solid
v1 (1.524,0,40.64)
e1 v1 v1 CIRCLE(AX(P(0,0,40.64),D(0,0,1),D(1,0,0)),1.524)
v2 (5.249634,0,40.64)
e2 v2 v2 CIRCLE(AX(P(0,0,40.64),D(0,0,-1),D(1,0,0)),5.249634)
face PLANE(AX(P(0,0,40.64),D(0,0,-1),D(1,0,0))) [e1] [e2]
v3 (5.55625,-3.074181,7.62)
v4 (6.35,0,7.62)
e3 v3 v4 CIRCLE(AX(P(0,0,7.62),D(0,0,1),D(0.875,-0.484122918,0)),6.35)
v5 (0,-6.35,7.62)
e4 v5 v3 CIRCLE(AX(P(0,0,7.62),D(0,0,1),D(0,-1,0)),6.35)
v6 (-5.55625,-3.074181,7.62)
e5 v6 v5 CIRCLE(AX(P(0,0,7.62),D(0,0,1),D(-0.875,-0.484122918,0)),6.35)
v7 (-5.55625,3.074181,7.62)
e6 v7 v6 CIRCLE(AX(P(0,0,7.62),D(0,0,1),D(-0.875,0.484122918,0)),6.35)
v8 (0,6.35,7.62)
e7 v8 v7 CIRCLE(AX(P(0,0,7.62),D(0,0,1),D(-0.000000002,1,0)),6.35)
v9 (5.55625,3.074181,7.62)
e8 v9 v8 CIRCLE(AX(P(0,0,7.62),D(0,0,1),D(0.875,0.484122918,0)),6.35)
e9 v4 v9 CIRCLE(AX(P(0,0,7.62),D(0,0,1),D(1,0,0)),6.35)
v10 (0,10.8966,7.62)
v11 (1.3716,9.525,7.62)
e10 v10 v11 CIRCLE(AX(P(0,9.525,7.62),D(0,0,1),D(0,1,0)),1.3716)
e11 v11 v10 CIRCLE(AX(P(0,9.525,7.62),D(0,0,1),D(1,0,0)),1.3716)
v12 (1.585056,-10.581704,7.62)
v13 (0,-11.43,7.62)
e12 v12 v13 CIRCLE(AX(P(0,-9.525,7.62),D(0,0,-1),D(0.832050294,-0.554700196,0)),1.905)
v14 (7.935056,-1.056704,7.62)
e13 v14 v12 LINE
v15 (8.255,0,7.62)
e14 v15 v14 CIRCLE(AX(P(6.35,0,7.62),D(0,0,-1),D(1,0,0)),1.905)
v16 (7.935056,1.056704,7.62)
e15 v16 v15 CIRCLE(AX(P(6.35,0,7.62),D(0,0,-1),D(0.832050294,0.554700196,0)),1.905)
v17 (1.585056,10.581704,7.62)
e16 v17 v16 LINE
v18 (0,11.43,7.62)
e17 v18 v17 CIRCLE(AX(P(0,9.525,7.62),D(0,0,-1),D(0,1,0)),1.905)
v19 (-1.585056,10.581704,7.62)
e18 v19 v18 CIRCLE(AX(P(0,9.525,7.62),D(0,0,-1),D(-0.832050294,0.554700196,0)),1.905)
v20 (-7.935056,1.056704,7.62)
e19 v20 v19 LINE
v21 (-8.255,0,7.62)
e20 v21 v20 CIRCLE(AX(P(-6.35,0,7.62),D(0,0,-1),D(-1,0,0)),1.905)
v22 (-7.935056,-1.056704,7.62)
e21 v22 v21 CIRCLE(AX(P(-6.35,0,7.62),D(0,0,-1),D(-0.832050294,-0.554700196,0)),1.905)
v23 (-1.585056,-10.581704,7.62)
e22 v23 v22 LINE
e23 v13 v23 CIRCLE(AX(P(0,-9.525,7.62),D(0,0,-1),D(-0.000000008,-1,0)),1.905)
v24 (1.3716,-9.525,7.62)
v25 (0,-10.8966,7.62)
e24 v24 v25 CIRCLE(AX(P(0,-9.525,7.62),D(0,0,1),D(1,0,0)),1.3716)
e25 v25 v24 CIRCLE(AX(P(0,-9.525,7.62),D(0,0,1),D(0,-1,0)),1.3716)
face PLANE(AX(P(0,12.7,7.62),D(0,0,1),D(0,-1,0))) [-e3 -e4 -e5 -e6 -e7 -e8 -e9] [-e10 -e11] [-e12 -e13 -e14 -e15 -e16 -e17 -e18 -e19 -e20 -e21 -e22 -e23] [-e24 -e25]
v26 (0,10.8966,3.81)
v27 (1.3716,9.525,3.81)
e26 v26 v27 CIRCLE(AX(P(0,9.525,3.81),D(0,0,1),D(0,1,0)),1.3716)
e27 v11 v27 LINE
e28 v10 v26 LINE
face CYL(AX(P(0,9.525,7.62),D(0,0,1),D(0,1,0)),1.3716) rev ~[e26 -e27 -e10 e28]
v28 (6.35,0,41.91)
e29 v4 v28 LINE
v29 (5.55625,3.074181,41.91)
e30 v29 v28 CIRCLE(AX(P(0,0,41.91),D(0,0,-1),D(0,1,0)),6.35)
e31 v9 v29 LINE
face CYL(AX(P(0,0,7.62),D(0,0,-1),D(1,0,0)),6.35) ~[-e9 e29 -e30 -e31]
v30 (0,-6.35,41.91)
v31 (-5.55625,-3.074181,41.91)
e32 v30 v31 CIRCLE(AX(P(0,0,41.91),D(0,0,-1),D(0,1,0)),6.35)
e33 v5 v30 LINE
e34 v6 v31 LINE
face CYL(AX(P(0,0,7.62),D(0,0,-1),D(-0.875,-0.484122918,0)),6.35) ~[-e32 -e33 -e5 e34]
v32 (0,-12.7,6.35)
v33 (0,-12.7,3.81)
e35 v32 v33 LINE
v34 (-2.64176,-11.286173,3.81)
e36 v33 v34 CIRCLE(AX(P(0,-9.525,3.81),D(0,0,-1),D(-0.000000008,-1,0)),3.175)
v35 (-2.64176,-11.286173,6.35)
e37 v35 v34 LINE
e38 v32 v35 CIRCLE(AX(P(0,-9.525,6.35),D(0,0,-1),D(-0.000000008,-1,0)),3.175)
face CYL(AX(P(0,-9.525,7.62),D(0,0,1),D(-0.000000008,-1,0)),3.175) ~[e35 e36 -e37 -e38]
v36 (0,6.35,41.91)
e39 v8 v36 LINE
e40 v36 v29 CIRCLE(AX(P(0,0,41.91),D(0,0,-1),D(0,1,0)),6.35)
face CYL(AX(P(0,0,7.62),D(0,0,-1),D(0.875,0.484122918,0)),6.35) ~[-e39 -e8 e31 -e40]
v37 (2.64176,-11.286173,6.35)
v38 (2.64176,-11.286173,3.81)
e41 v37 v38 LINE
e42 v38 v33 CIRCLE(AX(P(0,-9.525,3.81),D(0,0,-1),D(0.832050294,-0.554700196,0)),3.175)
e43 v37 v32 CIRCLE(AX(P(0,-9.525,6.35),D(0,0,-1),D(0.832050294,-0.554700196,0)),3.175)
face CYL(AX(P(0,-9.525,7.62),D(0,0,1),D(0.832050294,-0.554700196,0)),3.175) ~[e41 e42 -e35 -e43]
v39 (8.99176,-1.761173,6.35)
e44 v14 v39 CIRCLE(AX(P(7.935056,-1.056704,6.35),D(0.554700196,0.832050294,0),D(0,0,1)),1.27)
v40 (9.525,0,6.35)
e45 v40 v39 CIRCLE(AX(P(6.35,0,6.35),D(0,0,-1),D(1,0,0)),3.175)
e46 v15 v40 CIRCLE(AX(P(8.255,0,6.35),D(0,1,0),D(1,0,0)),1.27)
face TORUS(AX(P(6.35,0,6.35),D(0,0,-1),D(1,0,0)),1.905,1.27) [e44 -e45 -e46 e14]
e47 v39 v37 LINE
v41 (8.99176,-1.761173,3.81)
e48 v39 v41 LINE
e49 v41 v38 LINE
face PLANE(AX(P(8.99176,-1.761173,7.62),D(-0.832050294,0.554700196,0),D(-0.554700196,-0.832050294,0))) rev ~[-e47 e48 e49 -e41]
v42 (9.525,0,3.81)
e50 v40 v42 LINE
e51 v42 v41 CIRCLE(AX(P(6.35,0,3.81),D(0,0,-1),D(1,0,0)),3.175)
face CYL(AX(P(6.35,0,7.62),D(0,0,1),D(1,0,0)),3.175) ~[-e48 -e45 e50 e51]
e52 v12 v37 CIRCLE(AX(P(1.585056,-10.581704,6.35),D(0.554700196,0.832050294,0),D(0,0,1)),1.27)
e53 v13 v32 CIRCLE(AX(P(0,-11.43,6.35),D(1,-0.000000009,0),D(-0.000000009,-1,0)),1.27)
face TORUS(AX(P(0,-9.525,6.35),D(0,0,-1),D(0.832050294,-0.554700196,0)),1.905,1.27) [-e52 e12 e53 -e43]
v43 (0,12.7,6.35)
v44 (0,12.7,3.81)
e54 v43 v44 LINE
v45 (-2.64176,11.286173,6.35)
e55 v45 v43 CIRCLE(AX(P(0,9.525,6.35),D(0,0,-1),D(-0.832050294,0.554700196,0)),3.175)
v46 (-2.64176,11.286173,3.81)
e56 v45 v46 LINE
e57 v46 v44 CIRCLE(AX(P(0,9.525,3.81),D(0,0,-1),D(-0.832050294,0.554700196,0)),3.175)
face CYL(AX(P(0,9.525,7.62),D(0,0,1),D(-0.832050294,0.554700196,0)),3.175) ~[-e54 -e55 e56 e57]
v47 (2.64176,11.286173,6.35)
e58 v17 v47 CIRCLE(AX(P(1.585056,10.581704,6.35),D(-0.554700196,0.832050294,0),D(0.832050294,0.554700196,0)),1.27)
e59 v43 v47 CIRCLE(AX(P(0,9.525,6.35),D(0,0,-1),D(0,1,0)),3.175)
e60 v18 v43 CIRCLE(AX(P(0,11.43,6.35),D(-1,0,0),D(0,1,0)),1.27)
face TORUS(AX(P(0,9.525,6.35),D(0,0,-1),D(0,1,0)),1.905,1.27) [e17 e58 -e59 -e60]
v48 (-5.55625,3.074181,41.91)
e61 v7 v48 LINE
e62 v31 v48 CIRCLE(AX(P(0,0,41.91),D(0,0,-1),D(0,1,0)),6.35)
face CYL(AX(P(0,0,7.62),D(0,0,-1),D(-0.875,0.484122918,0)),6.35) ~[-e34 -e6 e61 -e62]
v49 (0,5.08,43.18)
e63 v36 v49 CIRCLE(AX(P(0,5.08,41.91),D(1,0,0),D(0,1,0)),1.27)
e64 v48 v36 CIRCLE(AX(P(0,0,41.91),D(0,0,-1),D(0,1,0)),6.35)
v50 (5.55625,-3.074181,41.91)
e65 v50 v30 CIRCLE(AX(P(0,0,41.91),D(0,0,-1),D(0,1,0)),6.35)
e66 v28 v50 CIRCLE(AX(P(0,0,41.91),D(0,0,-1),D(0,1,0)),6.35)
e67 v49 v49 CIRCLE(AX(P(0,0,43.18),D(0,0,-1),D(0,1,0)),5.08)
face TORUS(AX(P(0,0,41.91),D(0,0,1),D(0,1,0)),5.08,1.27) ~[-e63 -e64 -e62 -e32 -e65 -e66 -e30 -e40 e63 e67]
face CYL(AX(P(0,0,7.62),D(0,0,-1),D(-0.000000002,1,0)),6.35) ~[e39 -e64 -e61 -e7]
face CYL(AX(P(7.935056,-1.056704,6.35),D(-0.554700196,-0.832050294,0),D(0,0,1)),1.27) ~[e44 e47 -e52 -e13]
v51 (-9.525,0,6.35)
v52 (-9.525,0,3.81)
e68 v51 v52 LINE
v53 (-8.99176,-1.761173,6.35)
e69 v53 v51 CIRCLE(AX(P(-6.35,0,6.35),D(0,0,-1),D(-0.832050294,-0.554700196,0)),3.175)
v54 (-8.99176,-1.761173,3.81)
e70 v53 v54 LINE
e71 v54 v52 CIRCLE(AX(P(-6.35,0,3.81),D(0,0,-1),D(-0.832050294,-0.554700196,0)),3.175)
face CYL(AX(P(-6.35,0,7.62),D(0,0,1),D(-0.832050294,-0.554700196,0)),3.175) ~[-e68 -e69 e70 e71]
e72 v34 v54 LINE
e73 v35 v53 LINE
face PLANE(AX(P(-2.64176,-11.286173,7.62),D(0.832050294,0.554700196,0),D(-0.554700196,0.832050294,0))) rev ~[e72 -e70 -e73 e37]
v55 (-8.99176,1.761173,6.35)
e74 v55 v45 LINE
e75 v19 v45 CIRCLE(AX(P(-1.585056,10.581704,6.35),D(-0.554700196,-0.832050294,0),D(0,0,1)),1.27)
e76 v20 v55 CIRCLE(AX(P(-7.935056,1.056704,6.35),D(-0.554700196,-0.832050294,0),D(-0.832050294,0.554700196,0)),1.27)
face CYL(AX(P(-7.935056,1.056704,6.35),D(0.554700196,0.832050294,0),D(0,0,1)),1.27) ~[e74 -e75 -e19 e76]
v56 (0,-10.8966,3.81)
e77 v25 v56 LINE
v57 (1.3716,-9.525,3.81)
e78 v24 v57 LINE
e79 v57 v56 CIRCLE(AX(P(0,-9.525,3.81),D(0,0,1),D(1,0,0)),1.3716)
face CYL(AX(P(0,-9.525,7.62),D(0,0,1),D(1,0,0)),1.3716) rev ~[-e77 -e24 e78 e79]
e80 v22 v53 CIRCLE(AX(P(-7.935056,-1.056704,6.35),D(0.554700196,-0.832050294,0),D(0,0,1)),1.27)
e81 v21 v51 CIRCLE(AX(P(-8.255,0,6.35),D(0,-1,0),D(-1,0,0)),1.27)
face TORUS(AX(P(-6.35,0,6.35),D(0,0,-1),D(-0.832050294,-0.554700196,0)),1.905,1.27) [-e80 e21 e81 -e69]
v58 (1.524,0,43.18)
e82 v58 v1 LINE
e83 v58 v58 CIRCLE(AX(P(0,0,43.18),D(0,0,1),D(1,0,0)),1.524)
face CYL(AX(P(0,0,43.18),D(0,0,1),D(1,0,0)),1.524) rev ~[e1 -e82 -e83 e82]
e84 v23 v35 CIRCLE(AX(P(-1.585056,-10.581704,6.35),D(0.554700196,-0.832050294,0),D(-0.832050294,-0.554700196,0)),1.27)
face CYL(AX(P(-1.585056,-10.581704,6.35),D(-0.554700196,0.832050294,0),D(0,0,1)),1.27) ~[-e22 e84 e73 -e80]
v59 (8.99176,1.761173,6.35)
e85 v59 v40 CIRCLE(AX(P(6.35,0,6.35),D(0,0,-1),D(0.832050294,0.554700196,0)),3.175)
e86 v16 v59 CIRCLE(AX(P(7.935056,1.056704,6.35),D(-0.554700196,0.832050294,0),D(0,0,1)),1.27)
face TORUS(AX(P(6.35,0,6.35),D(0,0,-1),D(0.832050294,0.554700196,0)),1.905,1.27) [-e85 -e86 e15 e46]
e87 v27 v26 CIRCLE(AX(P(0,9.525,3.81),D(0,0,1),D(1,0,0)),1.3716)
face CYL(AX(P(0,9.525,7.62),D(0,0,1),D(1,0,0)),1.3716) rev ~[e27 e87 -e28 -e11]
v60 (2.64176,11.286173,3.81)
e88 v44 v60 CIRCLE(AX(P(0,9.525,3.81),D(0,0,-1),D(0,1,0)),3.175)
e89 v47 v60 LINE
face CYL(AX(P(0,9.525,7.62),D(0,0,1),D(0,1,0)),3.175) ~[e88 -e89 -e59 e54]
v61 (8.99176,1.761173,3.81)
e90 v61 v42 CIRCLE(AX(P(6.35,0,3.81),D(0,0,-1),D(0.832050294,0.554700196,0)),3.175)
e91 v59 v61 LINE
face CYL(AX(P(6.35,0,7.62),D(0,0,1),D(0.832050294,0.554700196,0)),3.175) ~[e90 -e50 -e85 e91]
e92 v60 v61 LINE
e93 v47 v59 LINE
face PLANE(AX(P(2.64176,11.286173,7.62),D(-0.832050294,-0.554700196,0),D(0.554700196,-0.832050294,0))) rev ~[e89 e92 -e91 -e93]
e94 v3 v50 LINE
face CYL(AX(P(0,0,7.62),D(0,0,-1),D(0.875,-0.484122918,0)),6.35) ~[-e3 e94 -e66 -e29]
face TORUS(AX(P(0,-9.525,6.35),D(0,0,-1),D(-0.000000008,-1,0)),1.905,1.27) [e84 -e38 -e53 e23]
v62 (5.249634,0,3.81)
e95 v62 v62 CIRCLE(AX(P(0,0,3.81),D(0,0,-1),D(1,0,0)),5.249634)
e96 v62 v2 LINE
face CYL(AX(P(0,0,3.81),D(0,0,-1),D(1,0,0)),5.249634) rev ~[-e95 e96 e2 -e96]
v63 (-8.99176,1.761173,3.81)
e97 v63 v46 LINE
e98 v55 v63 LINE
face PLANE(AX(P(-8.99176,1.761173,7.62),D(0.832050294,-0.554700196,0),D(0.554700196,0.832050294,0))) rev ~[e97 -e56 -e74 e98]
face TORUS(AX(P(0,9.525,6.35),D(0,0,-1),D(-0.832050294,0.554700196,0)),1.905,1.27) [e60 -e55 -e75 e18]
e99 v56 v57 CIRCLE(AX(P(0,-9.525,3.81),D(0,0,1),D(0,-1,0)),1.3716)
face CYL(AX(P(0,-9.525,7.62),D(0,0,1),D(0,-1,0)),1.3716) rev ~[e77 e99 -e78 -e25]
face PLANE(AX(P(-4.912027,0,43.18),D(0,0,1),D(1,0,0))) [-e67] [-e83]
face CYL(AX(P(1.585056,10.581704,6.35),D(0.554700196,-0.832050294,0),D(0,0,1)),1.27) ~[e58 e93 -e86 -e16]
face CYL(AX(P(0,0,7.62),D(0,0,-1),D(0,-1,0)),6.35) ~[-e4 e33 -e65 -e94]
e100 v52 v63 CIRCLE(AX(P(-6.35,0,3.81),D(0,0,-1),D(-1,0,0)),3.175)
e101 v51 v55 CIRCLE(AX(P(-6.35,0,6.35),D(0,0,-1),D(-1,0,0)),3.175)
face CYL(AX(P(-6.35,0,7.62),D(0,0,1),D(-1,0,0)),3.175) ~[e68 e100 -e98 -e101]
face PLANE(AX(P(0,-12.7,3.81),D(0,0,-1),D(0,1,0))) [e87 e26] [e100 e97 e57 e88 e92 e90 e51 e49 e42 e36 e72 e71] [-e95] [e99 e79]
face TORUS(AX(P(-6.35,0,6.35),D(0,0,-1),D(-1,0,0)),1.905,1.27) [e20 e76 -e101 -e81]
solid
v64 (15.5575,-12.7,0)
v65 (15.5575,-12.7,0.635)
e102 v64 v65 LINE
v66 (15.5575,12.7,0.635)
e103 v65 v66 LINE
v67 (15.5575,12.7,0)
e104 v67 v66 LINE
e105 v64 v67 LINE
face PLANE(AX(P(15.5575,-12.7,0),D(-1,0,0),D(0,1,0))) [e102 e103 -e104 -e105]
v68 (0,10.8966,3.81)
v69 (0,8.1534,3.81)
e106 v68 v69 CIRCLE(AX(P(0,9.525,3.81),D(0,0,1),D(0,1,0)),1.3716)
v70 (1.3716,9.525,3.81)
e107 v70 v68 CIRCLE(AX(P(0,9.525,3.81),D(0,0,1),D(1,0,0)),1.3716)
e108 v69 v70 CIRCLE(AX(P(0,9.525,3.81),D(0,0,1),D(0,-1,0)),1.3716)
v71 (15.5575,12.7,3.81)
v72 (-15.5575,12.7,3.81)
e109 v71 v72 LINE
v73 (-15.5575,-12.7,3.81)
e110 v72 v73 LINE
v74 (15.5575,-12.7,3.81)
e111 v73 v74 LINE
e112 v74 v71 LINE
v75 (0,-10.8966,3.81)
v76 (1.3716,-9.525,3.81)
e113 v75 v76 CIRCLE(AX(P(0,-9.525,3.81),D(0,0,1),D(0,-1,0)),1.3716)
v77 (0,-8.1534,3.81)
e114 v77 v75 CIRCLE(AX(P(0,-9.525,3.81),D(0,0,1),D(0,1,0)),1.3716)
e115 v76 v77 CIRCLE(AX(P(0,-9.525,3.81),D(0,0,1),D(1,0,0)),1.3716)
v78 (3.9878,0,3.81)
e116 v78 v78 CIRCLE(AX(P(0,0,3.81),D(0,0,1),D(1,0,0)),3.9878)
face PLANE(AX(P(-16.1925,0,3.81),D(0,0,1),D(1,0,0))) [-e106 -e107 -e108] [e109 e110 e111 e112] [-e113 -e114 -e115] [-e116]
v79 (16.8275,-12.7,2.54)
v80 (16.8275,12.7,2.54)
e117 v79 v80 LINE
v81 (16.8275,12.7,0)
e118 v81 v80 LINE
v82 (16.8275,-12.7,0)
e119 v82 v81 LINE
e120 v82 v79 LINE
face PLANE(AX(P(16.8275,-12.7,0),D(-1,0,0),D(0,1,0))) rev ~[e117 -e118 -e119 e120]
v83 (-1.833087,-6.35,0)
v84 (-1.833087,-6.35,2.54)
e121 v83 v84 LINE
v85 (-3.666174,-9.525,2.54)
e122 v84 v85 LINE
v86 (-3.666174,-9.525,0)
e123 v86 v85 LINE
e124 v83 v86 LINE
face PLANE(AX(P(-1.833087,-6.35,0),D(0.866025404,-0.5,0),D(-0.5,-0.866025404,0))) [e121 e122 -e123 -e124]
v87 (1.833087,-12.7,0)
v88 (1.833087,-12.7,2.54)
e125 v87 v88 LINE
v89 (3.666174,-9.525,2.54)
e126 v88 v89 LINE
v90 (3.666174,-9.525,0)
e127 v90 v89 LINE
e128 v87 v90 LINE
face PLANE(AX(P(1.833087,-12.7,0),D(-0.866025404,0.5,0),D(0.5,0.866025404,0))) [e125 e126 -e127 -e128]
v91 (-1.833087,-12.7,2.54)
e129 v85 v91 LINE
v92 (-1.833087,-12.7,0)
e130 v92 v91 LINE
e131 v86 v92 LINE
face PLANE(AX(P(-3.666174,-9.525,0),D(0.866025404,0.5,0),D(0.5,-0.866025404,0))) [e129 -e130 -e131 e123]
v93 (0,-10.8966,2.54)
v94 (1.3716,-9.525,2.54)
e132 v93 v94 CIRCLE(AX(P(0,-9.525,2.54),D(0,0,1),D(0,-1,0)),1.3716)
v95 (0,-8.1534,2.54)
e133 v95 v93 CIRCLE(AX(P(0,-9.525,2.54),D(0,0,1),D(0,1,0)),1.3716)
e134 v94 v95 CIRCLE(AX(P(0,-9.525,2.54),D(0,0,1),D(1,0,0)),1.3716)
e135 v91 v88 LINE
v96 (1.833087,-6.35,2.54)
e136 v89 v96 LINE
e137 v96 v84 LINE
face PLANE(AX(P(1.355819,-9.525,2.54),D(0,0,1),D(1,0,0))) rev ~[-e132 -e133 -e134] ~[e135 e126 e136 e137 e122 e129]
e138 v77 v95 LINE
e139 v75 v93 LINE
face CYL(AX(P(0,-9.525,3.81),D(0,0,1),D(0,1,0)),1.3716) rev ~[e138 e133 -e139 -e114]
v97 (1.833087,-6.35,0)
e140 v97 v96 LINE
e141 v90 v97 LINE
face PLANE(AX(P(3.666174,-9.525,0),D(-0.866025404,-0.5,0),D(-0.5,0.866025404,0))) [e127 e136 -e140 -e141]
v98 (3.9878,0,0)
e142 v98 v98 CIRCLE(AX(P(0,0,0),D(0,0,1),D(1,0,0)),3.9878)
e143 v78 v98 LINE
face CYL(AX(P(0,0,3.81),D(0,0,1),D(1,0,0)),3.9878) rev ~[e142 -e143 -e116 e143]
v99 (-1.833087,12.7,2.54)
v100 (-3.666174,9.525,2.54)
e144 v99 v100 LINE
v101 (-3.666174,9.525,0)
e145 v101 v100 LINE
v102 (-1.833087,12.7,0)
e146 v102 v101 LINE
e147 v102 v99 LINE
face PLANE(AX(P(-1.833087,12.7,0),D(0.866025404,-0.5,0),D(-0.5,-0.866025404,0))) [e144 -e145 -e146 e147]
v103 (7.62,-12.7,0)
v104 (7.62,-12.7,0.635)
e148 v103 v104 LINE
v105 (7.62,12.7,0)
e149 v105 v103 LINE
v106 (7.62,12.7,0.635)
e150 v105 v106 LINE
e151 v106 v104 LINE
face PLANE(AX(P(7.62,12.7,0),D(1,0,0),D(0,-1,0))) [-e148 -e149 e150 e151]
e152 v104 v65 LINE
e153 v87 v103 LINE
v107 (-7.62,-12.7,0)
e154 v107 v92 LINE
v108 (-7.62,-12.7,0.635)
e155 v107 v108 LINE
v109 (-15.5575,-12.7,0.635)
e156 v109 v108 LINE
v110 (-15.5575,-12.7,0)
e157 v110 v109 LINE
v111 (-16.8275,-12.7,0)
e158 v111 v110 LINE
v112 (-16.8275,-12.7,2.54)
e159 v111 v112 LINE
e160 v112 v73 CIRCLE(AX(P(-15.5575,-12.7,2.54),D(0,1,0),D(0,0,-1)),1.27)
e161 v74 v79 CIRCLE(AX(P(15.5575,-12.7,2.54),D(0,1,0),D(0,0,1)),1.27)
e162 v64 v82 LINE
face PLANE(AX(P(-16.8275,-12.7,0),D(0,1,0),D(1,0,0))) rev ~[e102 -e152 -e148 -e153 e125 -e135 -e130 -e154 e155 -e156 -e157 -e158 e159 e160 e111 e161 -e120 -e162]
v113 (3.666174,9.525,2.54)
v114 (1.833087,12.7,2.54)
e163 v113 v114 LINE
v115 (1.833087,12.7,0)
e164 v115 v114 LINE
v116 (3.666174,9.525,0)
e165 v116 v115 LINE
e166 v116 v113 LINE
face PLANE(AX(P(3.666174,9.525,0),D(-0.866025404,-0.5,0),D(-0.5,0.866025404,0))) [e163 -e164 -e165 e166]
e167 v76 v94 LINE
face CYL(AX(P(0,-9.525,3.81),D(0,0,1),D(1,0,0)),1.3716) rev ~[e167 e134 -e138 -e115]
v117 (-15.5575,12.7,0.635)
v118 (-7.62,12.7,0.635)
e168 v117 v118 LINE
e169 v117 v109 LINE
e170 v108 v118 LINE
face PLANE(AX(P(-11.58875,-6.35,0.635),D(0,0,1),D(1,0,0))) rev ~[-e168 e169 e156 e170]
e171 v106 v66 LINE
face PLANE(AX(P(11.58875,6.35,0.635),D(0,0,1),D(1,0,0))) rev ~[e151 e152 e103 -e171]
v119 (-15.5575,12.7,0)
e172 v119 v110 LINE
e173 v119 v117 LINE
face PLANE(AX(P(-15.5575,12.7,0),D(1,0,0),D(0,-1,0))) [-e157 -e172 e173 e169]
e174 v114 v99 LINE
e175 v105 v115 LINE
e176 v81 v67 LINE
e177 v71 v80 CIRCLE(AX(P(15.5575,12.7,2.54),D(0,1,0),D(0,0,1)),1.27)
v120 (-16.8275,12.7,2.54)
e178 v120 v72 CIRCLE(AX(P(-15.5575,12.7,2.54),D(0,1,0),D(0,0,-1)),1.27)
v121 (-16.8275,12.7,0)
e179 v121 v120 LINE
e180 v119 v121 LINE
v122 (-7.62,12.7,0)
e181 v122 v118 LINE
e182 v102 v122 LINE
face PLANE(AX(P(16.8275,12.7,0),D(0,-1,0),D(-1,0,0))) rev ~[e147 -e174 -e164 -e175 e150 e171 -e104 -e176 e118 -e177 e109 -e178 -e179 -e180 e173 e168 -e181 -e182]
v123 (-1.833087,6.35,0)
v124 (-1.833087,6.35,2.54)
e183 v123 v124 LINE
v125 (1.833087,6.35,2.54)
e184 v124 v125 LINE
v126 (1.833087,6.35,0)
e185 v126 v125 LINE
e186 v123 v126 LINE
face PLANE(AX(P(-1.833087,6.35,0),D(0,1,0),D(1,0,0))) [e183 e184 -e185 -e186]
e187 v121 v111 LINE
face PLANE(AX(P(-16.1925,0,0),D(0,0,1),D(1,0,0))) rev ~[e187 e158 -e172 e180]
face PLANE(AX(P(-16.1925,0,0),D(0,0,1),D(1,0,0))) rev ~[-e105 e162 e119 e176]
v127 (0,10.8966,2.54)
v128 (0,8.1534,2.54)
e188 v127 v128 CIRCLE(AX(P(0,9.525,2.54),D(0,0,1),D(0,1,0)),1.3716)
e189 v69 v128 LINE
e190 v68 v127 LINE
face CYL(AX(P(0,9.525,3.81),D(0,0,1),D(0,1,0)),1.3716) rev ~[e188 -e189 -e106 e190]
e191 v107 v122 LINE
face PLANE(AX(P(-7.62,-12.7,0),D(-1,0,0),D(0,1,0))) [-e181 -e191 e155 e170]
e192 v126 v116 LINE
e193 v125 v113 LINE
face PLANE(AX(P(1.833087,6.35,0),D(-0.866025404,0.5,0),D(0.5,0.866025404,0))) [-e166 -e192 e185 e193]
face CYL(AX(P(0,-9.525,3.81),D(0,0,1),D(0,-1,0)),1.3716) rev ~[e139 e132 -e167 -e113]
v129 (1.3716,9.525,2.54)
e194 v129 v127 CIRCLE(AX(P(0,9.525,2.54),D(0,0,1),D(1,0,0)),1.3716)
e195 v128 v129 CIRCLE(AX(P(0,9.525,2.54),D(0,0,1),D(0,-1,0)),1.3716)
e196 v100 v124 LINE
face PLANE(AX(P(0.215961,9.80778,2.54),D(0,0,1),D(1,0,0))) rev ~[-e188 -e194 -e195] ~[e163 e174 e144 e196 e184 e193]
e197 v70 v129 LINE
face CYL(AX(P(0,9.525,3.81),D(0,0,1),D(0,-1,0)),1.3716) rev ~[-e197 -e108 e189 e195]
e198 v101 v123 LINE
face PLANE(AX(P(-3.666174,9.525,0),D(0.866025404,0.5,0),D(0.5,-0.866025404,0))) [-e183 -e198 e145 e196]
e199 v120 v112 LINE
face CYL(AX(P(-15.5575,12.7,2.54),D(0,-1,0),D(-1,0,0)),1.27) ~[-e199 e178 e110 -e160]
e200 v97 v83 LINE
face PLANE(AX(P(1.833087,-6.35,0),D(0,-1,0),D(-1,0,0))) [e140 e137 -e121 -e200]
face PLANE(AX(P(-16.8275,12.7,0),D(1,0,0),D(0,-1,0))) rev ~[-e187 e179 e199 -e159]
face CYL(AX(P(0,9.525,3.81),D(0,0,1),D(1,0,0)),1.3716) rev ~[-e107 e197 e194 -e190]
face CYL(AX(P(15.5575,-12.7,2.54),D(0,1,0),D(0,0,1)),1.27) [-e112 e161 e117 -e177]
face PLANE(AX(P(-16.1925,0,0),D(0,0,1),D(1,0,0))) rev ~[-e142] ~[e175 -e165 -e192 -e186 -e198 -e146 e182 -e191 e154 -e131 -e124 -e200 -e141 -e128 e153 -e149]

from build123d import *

# Parameters (mm, degrees)
F0_W      = 7.9375
F0_H      = 12.7
F1_DEPTH  = 3.81
F2_DEPTH  = 0.635
F3_R      = 3.9878
F3_R_2    = 2.54
F4_DEPTH  = 3.81
F6_DEPTH  = 3.81
F8_DEPTH  = 2.54
F9_W      = 12.7
F9_H      = 3.81
F10_DEPTH = 9.525
F12_DEPTH = 3.81
F14_DEPTH = 3.81
F16_DEPTH = 35.56
F17_R     = 1.27
F17_2_R   = 1.27
F18_R     = 5.2496341023
F19_DEPTH = 36.83
F20_R     = 1.524
F21_DEPTH = 25.4


# Not quite as in the source:
# - a fillet or chamfer that OpenCascade refuses, or shapes differently, is made with other operations: its cross-section is extruded or revolved along the edge and cut away or added


with BuildPart() as f1:
    # F0 (on Top) → F1 (new body)
    with BuildSketch(Plane.XY):
        Polygon((-15.5575, -12.7), (-15.5575, 0), (-15.5575, 12.7), (-16.8275, 12.7), (-16.8275, -12.7), align=None)
        with Locations((-11.58875, 6.35)):
            Rectangle(F0_W, F0_H)
        with Locations((-11.58875, -6.35)):
            Rectangle(F0_W, F0_H)
        with BuildLine():
            ThreePointArc((0, -2.54), (-1.7960512242, -1.7960512242), (-2.54, 0))
            Line((-2.54, 0), (-7.62, 0))
            Line((-7.62, 0), (-7.62, -12.7))
            Line((-7.62, -12.7), (0, -12.7))
            Line((0, -12.7), (0, -2.54))
        make_face()
        with BuildLine():
            ThreePointArc((-2.54, 0), (0, 2.54), (2.54, 0))
            Line((2.54, 0), (7.62, 0))
            Line((7.62, 0), (7.62, 12.7))
            Line((7.62, 12.7), (-7.62, 12.7))
            Line((-7.62, 12.7), (-7.62, 0))
            Line((-7.62, 0), (-2.54, 0))
        make_face()
        with BuildLine():
            Line((7.62, 0), (2.54, 0))
            ThreePointArc((2.54, 0), (1.7960512242, -1.7960512242), (0, -2.54))
            Line((0, -2.54), (0, -12.7))
            Line((0, -12.7), (7.62, -12.7))
            Line((7.62, -12.7), (7.62, 0))
        make_face()
        with Locations((11.58875, -6.35)):
            Rectangle(F0_W, F0_H)
        with Locations((11.58875, 6.35)):
            Rectangle(F0_W, F0_H)
        Polygon((15.5575, 12.7), (15.5575, 0), (15.5575, -12.7), (16.8275, -12.7), (16.8275, 12.7), align=None)
    extrude(amount=F1_DEPTH)

    # F0 (on Top) → F2 (cut)
    with BuildSketch(Plane.XY):
        with Locations((-11.58875, -6.35)):
            Rectangle(F0_W, F0_H)
        with Locations((-11.58875, 6.35)):
            Rectangle(F0_W, F0_H)
        with Locations((11.58875, 6.35)):
            Rectangle(F0_W, F0_H)
        with Locations((11.58875, -6.35)):
            Rectangle(F0_W, F0_H)
    extrude(amount=F2_DEPTH, mode=Mode.SUBTRACT)

    # F3 (on face) → F4 (cut, through all)
    with BuildSketch(Plane.XY.offset(3.81)):
        Circle(F3_R)
        Circle(F3_R_2, mode=Mode.SUBTRACT)
    extrude(amount=-F4_DEPTH, mode=Mode.SUBTRACT)

    # F5 (on face) → F6 (cut, through all)
    with BuildSketch(Plane.XY.offset(3.81)):
        with BuildLine():
            ThreePointArc((0, 10.8966), (-1.3716, 9.525), (0, 8.1534))
            Line((0, 8.1534), (0, 9.525))
            Line((0, 9.525), (0, 10.8966))
        make_face()
        with BuildLine():
            Line((0, 9.525), (0, 8.1534))
            ThreePointArc((0, 8.1534), (0.9698676611, 8.5551323389), (1.3716, 9.525))
            ThreePointArc((1.3716, 9.525), (0.9698676611, 10.4948676611), (0, 10.8966))
            Line((0, 10.8966), (0, 9.525))
        make_face()
        with BuildLine():
            ThreePointArc((1.3716, -9.525), (0.9698676611, -8.5551323389), (0, -8.1534))
            Line((0, -8.1534), (0, -9.525))
            Line((0, -9.525), (0, -10.8966))
            ThreePointArc((0, -10.8966), (0.9698676611, -10.4948676611), (1.3716, -9.525))
        make_face()
        with BuildLine():
            Line((0, -9.525), (0, -8.1534))
            ThreePointArc((0, -8.1534), (-1.3716, -9.525), (0, -10.8966))
            Line((0, -10.8966), (0, -9.525))
        make_face()
    extrude(amount=-F6_DEPTH, mode=Mode.SUBTRACT)

    # F7 (on face) → F8 (cut)
    with BuildSketch(Plane.XY):
        Polygon((1.8330871047, -6.35), (0, -6.35), (0, -9.525), (0, -12.7), (1.8330871047, -12.7), (3.6661742094, -9.525), align=None)
        Polygon((0, -12.7), (0, -9.525), (-3.6661742094, -9.525), (-1.8330871047, -12.7), align=None)
        Polygon((0, -9.525), (0, -6.35), (-1.8330871047, -6.35), (-3.6661742094, -9.525), align=None)
        Polygon((0, 9.525), (0, 6.35), (1.8330871047, 6.35), (3.6661742094, 9.525), (1.8330871047, 12.7), (-1.8330871047, 12.7), (-3.6661742094, 9.525), align=None)
        Polygon((-1.8330871047, 6.35), (0, 6.35), (0, 9.525), (-3.6661742094, 9.525), align=None)
    extrude(amount=F8_DEPTH, mode=Mode.SUBTRACT)

    # F17
    f17_edges = [f1.edges().sort_by_distance(p)[0] for p in [
        (16.8275, 0, 3.81),
        (-16.8275, 0, 3.81),
    ]]
    fillet(f17_edges, radius=F17_R)


with BuildPart() as f10:
    # F9 (on Right) → F10 (new body, symmetric)
    with BuildSketch(Plane.YZ):
        with Locations((6.35, 5.715)):
            Rectangle(F9_W, F9_H)
        with Locations((-6.35, 5.715)):
            Rectangle(F9_W, F9_H)
    extrude(amount=F10_DEPTH, both=True)

    # F11 (on face) → F12 (cut)
    with BuildSketch(Plane.XY.offset(7.62)):
        with BuildLine():
            ThreePointArc((1.3716, 9.525), (0.9698676611, 10.4948676611), (0, 10.8966))
            ThreePointArc((0, 10.8966), (-0.9698676611, 8.5551323389), (1.3716, 9.525))
        make_face()
        with BuildLine():
            ThreePointArc((1.3716, -9.525), (-0.9698676611, -8.5551323389), (0, -10.8966))
            ThreePointArc((0, -10.8966), (0.9698676611, -10.4948676611), (1.3716, -9.525))
        make_face()
    extrude(amount=-F12_DEPTH, mode=Mode.SUBTRACT)

    # F13 (on face) → F14 (cut)
    with BuildSketch(Plane.XY.offset(7.62)):
        with BuildLine():
            Line((-8.9917596845, 1.761173123), (-2.6417596845, 11.286173123))
            ThreePointArc((-2.6417596845, 11.286173123), (-1.4981489136, 12.3243168511), (0, 12.7))
            Line((0, 12.7), (-9.525, 12.7))
            Line((-9.525, 12.7), (-9.525, 0))
            ThreePointArc((-9.525, 0), (-9.3887671841, 0.9200646721), (-8.9917596845, 1.761173123))
        make_face()
        with BuildLine():
            ThreePointArc((0, 12.7), (1.4981489136, 12.3243168511), (2.6417596845, 11.286173123))
            Line((2.6417596845, 11.286173123), (8.9917596845, 1.761173123))
            ThreePointArc((8.9917596845, 1.761173123), (9.3887671841, 0.9200646721), (9.525, 0))
            Line((9.525, 0), (9.525, 12.7))
            Line((9.525, 12.7), (0, 12.7))
        make_face()
        with BuildLine():
            ThreePointArc((-8.9917596845, -1.761173123), (-9.3887671841, -0.9200646721), (-9.525, 0))
            Line((-9.525, 0), (-9.525, -12.7))
            Line((-9.525, -12.7), (-2.72e-08, -12.7))
            ThreePointArc((-2.72e-08, -12.7), (-1.4981489256, -12.3243168447), (-2.6417596845, -11.286173123))
            Line((-2.6417596845, -11.286173123), (-8.9917596845, -1.761173123))
        make_face()
        with BuildLine():
            Line((9.525, -12.7), (9.525, 0))
            ThreePointArc((9.525, 0), (9.3887671841, -0.9200646721), (8.9917596845, -1.761173123))
            Line((8.9917596845, -1.761173123), (2.6417596845, -11.286173123))
            ThreePointArc((2.6417596845, -11.286173123), (1.4981489016, -12.3243168575), (-2.72e-08, -12.7))
            Line((-2.72e-08, -12.7), (9.525, -12.7))
        make_face()
    extrude(amount=-F14_DEPTH, mode=Mode.SUBTRACT)

    # F15 (on face) → F16 (join)
    with BuildSketch(Plane.XY.offset(7.62)):
        with BuildLine():
            ThreePointArc((-3.175, 0), (-3.8399421072, 1.9442824833), (-5.55625, 3.0741805311))
            ThreePointArc((-5.55625, 3.0741805311), (-6.35, 0), (-5.55625, -3.0741805311))
            ThreePointArc((-5.55625, -3.0741805311), (-3.8399421072, -1.9442824833), (-3.175, 0))
        make_face()
        with BuildLine():
            Line((0, 0), (0, 6.35))
            ThreePointArc((-1.01e-08, 6.35), (-3.2250157894, 5.4700798128), (-5.55625, 3.0741805311))
            ThreePointArc((-5.55625, 3.0741805311), (-3.8399421072, 1.9442824833), (-3.175, 0))
            ThreePointArc((-3.175, 0), (-3.8399421072, -1.9442824833), (-5.55625, -3.0741805311))
            ThreePointArc((-5.55625, -3.0741805311), (-3.2250157851, -5.4700798153), (0, -6.35))
            Line((0, -6.35), (0, 0))
        make_face()
        with BuildLine():
            ThreePointArc((5.55625, -3.0741805311), (3.175, 0), (5.55625, 3.0741805311))
            ThreePointArc((5.55625, 3.0741805311), (3.2250157807, 5.4700798179), (-1.01e-08, 6.35))
            Line((0, 6.35), (0, 0))
            Line((0, 0), (0, -6.35))
            ThreePointArc((0, -6.35), (3.2250157851, -5.4700798153), (5.55625, -3.0741805311))
        make_face()
        with BuildLine():
            ThreePointArc((5.55625, -3.0741805311), (6.1483610621, -1.5875), (6.35, 0))
            ThreePointArc((6.35, 0), (6.1483610621, 1.5875), (5.55625, 3.0741805311))
            ThreePointArc((5.55625, 3.0741805311), (3.175, 0), (5.55625, -3.0741805311))
        make_face()
    extrude(amount=F16_DEPTH)

    # F17#2
    f17_2_edges = [f10.edges().sort_by_distance(p)[0] for p in [
        (5.81676, -6.523673, 7.62),
    ]]
    fillet(f17_2_edges, radius=F17_2_R)

    # F18 (on face) → F19 (cut)
    with BuildSketch(Plane(origin=(0, 0, 3.81), x_dir=(1, 0, 0), z_dir=(0, 0, -1))):
        Circle(F18_R)
    extrude(amount=-F19_DEPTH, mode=Mode.SUBTRACT)

    # F20 (on face) → F21 (cut)
    with BuildSketch(Plane.XY.offset(43.18)):
        Circle(F20_R)
    extrude(amount=-F21_DEPTH, mode=Mode.SUBTRACT)

    # F22: fillet of radius 1.27 on 1 edges, made by hand

    # F22_s1 → F22_t2 (revolve, cut)
    with BuildSketch(Plane.YZ):
        with BuildLine():
            ThreePointArc((6.35, 41.91), (5.9780256121, 42.8080256121), (5.08, 43.18))
            Line((5.08, 43.18), (6.35, 43.18))
            Line((6.35, 43.18), (6.35, 41.91))
        make_face()
    revolve(axis=Axis((0, 0, 43.18), (0, 0, -1)), mode=Mode.SUBTRACT)


solid = Compound([f1.part, f10.part])
